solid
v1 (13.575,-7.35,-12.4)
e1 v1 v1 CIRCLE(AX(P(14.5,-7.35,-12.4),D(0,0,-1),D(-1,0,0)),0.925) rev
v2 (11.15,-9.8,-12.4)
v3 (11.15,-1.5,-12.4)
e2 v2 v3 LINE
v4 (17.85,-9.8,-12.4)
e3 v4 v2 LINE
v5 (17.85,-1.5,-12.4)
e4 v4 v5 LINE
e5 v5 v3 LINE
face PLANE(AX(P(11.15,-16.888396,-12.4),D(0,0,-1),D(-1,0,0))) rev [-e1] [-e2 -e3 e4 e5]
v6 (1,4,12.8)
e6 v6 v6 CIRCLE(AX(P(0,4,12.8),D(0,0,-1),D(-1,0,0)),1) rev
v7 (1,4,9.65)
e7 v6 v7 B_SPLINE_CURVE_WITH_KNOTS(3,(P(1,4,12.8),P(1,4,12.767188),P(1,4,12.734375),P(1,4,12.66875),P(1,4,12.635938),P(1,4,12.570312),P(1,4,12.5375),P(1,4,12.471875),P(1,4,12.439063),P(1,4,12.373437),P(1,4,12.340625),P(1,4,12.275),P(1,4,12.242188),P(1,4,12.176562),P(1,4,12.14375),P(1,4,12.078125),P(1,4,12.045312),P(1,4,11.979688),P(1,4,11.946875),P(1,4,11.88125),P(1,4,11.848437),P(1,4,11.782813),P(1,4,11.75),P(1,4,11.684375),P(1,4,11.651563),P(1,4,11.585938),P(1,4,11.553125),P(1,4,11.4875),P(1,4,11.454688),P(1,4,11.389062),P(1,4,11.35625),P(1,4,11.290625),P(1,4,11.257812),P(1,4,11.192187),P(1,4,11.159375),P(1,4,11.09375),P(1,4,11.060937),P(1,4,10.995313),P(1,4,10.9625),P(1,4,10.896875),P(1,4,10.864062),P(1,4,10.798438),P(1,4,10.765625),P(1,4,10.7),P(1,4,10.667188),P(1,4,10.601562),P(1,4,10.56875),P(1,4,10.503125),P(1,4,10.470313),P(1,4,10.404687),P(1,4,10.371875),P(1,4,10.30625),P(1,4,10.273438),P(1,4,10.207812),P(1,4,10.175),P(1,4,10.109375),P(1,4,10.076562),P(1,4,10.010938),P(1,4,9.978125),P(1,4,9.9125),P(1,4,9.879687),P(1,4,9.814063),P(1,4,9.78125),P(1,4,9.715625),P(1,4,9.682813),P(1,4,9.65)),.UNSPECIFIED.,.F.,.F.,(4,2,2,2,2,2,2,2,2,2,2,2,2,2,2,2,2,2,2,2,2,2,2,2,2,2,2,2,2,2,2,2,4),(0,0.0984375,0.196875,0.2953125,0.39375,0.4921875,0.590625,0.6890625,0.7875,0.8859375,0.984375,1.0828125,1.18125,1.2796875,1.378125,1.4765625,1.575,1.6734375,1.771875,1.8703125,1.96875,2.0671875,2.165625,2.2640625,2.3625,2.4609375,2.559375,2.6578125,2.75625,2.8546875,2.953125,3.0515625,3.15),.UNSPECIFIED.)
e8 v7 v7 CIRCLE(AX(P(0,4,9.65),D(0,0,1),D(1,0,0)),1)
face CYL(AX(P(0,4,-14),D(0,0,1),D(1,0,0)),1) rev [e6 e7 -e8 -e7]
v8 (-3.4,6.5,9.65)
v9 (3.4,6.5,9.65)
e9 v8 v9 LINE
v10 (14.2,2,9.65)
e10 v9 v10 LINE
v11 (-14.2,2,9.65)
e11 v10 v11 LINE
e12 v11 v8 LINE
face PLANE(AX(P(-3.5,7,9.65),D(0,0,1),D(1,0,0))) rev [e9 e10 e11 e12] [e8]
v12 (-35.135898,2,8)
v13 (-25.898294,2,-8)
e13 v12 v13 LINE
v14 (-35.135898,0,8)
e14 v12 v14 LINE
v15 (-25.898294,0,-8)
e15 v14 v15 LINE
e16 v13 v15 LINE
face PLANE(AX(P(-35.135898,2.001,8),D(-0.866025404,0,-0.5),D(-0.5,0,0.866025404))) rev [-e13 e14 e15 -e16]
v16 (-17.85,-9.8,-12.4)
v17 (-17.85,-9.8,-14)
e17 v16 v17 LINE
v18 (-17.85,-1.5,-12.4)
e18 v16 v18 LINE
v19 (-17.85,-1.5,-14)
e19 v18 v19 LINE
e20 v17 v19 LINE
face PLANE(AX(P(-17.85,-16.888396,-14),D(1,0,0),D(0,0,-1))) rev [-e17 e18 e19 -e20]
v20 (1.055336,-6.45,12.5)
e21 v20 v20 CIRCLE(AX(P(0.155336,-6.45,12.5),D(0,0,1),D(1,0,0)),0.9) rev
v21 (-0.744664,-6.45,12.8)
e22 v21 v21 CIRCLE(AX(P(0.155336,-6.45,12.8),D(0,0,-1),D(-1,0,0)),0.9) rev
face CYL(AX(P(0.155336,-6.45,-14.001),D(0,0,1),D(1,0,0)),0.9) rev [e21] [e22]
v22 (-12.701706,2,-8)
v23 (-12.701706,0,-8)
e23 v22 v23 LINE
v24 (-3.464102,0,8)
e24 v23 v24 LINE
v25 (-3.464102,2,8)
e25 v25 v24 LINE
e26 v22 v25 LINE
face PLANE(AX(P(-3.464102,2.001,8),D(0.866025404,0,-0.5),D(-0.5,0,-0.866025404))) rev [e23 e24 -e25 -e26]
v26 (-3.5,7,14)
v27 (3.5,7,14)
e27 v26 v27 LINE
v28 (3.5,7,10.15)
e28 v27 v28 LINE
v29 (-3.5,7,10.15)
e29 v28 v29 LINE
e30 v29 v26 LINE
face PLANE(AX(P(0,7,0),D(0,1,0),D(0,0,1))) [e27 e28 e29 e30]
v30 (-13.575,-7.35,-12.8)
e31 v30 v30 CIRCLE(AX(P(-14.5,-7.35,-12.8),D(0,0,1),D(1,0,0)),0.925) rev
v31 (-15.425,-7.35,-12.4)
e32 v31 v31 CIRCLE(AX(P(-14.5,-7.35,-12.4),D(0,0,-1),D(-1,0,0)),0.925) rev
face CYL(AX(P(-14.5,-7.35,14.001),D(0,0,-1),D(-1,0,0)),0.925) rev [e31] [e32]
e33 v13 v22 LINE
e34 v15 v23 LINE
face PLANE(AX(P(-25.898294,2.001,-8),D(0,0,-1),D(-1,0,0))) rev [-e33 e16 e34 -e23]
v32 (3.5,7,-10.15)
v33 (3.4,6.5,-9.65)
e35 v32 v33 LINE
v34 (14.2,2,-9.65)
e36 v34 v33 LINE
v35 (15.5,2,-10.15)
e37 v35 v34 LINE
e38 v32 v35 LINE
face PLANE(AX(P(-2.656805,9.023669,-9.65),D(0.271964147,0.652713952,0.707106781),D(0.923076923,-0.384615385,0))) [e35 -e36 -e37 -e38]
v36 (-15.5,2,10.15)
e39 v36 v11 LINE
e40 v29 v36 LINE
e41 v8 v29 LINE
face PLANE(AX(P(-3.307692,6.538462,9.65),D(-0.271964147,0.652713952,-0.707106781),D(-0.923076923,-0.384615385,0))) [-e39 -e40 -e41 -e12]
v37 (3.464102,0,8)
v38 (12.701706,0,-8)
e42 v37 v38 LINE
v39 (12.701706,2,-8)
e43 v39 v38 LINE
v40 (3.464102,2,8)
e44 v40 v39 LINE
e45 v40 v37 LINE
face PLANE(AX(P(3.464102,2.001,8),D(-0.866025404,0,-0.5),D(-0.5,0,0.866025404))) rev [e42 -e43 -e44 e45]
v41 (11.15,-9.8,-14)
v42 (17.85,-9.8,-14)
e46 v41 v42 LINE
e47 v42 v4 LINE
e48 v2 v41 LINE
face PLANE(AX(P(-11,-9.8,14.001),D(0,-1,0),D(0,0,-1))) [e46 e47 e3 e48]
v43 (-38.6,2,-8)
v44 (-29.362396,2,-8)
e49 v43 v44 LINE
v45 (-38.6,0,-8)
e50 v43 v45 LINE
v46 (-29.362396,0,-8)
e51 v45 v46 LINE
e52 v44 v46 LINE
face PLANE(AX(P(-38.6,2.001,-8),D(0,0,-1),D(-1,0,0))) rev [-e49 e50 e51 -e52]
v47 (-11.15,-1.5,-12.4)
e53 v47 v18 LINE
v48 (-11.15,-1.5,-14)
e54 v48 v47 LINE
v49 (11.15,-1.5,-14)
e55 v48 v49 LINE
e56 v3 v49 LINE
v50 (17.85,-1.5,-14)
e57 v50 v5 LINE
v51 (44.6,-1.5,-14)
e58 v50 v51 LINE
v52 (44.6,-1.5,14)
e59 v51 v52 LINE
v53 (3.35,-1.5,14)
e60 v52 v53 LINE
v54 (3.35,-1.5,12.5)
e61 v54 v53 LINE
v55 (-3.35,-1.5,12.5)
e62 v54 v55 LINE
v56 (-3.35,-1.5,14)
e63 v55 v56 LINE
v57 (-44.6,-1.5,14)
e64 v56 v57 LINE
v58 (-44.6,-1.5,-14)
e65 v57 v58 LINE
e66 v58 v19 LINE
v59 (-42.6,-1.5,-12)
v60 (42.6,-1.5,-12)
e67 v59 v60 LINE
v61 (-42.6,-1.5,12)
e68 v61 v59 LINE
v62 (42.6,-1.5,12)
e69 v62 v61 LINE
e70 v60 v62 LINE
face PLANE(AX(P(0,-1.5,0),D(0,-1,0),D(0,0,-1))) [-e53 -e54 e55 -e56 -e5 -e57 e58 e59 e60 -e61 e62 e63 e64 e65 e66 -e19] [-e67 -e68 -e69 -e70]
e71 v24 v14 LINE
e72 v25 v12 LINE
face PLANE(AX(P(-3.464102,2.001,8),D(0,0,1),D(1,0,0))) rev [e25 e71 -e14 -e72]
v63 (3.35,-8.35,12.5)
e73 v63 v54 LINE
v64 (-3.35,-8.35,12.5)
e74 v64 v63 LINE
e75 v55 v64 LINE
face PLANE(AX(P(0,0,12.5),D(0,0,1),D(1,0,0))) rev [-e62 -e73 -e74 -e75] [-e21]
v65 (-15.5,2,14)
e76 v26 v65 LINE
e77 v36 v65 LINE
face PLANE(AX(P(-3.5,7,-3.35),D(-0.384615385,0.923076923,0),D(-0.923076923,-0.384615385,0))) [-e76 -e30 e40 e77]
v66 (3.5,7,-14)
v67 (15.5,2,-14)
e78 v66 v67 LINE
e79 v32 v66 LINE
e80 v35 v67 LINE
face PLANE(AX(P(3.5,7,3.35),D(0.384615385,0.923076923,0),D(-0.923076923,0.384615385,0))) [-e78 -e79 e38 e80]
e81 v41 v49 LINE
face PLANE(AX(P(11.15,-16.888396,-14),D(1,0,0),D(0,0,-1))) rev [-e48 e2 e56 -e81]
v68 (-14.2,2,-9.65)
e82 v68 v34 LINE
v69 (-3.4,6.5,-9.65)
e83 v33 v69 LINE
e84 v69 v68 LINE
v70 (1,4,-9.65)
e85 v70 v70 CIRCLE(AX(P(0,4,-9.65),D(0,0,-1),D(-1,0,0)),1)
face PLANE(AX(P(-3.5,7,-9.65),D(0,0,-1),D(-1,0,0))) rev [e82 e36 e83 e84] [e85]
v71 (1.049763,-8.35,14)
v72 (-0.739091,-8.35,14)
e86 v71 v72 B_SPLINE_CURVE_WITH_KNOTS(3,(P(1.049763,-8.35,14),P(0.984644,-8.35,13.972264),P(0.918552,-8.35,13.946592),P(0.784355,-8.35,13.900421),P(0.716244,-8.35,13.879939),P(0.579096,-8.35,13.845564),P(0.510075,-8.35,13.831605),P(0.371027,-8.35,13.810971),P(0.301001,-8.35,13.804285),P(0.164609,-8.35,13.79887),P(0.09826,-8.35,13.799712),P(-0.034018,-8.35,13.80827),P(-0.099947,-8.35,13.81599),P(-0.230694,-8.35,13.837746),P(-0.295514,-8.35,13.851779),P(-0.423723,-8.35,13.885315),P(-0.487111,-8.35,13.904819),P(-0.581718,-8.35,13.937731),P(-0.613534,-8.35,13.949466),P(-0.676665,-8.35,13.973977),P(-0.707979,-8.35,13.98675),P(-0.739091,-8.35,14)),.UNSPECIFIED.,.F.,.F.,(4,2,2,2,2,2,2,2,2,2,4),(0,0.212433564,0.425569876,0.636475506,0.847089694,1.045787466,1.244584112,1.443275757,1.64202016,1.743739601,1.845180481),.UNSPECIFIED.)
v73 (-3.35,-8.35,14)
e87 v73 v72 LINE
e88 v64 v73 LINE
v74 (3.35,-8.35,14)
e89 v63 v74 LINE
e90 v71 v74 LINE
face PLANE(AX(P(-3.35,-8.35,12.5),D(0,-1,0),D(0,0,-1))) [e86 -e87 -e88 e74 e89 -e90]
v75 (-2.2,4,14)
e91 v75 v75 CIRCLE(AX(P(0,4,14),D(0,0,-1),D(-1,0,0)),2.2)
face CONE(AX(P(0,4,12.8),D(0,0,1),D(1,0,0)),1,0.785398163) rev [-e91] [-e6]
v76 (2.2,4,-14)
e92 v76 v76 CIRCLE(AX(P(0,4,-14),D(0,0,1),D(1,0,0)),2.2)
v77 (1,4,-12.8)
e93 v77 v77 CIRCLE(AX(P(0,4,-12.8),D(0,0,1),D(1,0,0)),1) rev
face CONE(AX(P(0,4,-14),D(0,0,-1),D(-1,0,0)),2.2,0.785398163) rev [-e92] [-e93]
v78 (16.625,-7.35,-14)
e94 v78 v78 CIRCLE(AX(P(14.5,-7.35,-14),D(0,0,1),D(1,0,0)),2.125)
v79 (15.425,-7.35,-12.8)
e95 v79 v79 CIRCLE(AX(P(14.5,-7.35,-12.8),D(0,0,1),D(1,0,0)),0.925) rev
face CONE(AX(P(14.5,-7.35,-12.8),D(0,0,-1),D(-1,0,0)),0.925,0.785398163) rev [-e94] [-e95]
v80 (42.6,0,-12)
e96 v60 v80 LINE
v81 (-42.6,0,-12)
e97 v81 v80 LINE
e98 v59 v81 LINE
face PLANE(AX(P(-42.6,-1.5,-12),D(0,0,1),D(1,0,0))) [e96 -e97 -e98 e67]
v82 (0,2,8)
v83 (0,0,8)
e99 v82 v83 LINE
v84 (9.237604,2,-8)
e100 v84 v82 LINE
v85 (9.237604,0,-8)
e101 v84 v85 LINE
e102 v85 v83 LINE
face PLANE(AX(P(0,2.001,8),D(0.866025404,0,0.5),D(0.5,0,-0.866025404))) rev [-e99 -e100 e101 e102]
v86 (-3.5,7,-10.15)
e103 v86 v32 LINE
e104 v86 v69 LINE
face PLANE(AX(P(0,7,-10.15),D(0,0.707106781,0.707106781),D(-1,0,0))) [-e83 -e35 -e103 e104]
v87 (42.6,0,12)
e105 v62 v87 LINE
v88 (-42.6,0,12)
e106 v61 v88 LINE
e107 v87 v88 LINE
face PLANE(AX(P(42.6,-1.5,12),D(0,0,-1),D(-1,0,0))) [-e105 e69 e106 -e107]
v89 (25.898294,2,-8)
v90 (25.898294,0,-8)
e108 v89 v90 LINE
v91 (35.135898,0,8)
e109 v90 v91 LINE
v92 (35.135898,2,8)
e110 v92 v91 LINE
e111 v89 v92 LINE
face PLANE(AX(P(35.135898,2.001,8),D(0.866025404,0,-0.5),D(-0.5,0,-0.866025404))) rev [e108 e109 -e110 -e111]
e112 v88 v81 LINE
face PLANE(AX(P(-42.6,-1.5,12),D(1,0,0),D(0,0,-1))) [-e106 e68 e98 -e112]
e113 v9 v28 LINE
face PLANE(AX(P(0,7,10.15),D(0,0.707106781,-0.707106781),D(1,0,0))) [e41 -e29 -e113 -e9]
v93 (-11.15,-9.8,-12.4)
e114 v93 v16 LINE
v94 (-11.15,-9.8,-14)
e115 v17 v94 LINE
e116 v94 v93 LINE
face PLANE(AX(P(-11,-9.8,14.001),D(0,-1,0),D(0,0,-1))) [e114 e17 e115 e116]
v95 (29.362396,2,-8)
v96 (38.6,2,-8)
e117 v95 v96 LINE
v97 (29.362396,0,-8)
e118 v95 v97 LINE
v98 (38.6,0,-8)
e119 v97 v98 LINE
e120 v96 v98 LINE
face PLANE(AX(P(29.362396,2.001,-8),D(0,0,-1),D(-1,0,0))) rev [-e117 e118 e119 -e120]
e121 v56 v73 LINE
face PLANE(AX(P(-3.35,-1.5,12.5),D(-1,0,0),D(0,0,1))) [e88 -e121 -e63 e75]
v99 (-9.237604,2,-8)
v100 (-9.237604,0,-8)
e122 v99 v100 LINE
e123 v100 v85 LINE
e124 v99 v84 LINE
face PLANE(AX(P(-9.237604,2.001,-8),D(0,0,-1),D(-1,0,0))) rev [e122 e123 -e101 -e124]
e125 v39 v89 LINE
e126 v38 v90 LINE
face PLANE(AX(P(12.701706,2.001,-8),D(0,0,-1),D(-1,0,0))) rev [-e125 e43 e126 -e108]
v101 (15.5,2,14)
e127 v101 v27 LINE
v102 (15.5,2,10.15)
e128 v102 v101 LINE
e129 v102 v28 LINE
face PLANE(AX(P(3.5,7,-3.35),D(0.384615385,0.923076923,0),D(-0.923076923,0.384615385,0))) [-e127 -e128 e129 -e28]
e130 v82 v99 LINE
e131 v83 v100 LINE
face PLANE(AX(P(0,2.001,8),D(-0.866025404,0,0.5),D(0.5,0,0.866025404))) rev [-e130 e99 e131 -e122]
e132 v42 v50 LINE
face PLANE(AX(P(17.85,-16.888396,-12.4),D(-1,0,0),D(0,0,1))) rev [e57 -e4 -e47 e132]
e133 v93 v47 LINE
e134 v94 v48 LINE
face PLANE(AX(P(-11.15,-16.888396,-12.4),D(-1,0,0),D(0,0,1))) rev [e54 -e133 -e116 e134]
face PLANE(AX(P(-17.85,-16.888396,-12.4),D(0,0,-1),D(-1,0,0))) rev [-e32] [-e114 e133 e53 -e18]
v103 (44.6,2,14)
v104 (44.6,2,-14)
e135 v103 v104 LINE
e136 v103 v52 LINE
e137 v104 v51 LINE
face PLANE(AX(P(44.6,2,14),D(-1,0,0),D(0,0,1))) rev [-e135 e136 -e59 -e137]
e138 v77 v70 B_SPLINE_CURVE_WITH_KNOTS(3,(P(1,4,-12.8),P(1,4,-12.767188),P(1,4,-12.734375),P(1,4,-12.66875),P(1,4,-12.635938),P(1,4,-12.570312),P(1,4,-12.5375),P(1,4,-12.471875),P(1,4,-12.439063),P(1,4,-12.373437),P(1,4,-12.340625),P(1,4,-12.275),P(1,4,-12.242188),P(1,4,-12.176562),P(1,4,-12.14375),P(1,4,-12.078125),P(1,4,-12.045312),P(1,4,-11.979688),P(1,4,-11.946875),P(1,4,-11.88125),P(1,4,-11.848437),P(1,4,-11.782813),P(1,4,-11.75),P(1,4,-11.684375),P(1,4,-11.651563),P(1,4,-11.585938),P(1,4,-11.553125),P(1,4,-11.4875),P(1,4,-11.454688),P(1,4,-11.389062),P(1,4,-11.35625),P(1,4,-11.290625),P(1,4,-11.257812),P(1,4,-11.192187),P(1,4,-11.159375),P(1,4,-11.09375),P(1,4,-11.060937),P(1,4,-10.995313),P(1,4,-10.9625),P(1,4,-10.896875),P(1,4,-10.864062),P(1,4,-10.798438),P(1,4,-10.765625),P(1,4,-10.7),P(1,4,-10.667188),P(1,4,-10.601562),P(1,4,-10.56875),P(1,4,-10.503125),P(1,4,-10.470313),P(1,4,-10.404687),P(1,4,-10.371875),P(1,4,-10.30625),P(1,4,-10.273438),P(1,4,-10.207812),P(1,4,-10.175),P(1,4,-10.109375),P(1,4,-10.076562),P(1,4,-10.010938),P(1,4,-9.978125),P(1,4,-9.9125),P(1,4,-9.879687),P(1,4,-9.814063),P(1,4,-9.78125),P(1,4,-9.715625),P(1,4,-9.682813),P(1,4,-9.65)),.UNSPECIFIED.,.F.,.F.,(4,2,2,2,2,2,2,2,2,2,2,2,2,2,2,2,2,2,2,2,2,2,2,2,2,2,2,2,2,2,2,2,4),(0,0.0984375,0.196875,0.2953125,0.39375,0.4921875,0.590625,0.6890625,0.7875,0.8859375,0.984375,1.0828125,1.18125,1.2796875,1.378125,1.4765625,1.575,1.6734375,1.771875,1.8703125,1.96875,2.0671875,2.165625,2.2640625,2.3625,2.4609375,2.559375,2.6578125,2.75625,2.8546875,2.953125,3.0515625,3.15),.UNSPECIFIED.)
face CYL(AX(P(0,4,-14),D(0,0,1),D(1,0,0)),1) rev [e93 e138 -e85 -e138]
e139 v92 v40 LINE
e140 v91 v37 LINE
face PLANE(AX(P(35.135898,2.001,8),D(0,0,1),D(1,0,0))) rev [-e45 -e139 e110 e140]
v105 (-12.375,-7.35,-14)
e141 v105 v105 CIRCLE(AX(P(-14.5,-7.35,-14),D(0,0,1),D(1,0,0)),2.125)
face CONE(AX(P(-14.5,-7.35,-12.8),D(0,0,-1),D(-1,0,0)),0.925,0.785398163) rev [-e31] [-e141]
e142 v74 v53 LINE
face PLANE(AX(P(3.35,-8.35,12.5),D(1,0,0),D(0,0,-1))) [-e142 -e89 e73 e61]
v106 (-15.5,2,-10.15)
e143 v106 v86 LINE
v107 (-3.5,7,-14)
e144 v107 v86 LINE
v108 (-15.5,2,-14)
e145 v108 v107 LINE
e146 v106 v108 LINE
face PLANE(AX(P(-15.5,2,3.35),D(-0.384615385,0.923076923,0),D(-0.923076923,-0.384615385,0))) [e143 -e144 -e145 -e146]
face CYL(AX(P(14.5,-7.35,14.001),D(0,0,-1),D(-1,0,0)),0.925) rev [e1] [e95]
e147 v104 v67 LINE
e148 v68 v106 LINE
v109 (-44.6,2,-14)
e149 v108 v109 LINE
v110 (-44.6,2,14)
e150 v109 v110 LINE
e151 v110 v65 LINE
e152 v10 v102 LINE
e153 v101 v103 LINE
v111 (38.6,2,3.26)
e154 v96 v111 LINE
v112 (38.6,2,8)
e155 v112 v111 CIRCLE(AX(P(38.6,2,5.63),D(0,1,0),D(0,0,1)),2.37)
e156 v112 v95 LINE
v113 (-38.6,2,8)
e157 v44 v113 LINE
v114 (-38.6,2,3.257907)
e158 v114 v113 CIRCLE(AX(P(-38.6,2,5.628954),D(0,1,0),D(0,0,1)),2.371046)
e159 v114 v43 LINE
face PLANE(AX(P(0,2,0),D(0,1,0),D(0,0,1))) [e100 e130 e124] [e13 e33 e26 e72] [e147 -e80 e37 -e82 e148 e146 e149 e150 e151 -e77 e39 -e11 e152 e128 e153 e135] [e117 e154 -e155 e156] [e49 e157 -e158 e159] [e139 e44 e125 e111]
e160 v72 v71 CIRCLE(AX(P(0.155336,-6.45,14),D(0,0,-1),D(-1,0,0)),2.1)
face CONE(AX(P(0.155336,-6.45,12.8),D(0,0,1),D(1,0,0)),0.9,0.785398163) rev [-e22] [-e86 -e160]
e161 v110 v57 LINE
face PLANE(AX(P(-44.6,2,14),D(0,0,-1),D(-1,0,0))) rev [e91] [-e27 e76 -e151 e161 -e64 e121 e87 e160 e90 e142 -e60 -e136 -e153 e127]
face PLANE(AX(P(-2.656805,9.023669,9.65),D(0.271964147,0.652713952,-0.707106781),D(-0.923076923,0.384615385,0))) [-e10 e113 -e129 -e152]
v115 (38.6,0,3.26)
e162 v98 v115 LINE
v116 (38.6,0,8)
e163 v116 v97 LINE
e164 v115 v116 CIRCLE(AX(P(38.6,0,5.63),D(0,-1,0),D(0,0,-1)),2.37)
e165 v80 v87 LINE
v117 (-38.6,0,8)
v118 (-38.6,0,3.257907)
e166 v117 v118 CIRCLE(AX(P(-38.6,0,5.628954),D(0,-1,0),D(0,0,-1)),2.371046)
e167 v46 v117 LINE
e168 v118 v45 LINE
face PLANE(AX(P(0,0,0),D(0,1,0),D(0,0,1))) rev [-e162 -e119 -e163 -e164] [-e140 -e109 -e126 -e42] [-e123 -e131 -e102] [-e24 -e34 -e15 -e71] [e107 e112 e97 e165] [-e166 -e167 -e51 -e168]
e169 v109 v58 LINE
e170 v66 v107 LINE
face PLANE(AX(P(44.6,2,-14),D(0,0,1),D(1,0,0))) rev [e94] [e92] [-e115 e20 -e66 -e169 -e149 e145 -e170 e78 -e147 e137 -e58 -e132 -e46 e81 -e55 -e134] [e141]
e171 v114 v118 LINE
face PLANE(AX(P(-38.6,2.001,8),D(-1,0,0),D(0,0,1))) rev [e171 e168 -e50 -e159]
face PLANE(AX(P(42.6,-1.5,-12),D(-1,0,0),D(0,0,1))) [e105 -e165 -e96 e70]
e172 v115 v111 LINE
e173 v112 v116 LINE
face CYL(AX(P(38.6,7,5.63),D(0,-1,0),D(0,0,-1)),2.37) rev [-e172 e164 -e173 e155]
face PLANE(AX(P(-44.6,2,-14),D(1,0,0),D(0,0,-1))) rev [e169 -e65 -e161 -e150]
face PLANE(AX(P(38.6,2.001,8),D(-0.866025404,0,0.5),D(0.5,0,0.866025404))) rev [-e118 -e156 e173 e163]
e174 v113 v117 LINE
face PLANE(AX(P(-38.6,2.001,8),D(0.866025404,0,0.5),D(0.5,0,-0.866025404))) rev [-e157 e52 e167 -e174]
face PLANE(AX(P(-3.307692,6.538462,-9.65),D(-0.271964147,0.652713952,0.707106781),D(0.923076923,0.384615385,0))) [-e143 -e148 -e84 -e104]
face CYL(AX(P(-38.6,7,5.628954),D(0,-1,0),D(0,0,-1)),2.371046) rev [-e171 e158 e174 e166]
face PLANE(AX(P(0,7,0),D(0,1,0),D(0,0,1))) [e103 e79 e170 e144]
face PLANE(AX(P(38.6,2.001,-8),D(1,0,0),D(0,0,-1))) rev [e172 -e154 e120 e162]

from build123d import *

# Parameters (mm, degrees)
SKETCH1_W           = 89.2
SKETCH1_H           = 28
BOSS_EXTRUDE1_DEPTH = 2
SKETCH3_W           = 89.2
SKETCH3_H           = 28
SKETCH3_W_2         = 85.2
SKETCH3_H_2         = 24
BOSS_EXTRUDE2_DEPTH = 1.5
CUT_EXTRUDE1_REACH  = 48.788
SKETCH5_W           = 7
SKETCH5_H           = 4.35
BOSS_EXTRUDE3_DEPTH = 5
SKETCH6_R           = 1
CUT_EXTRUDE2_DEPTH  = 54.124005873
BOSS_EXTRUDE4_DEPTH = 4.35
BOSS_EXTRUDE5_DEPTH = 4.35
CHAMFER1_SIZE       = 1.2
CHAMFER2_SIZE       = 1.2
SKETCH9_W           = 6.7
SKETCH9_H           = 6.85
BOSS_EXTRUDE6_DEPTH = 1.5
SKETCH15_W          = 6.7
SKETCH15_H          = 1.6
BOSS_EXTRUDE7_DEPTH = 8.3
CUT_EXTRUDE9_REACH  = 55.565
SKETCH16_R          = 0.925
CUT_EXTRUDE11_REACH = 55.565
SKETCH17_R          = 0.9
CHAMFER3_SIZE       = 1.2
CHAMFER4_SIZE       = 1.2
CUT_EXTRUDE12_DEPTH = 48.76190951
CHAMFER5_SIZE       = 0.5
CHAMFER6_SIZE       = 0.5


with BuildPart() as part:
    # Sketch1 → Boss-Extrude1 (new body)
    with BuildSketch(Plane(origin=(0, 0, 0), x_dir=(1, 0, 0), z_dir=(0, 1, 0))):
        Rectangle(SKETCH1_W, SKETCH1_H)
    extrude(amount=BOSS_EXTRUDE1_DEPTH)

    # Sketch3 → Boss-Extrude2 (add)
    with BuildSketch(Plane.XZ):
        Rectangle(SKETCH3_W, SKETCH3_H)
        Rectangle(SKETCH3_W_2, SKETCH3_H_2, mode=Mode.SUBTRACT)
    extrude(amount=BOSS_EXTRUDE2_DEPTH)

    # Sketch4 → Cut-Extrude1 (cut, up to next)
    with BuildSketch(Plane.XZ, mode=Mode.PRIVATE) as cut_extrude1_sk1:
        Polygon((38.6, -8), (38.6, 8), (29.362395693, -8), align=None)
    cut_extrude1_tool1 = extrude(cut_extrude1_sk1.sketch, amount=-CUT_EXTRUDE1_REACH, mode=Mode.PRIVATE) & part.part
    # Sketch4 → Cut-Extrude1 (cut, up to next)
    with BuildSketch(Plane.XZ, mode=Mode.PRIVATE) as cut_extrude1_sk2:
        Polygon((35.135898385, 8), (3.464101615, 8), (12.701705922, -8), (25.898294078, -8), align=None)
    cut_extrude1_tool2 = extrude(cut_extrude1_sk2.sketch, amount=-CUT_EXTRUDE1_REACH, mode=Mode.PRIVATE) & part.part
    # Sketch4 → Cut-Extrude1 (cut, up to next)
    with BuildSketch(Plane.XZ, mode=Mode.PRIVATE) as cut_extrude1_sk3:
        Polygon((-38.6, 8), (-38.6, -8), (-29.362395693, -8), align=None)
    cut_extrude1_tool3 = extrude(cut_extrude1_sk3.sketch, amount=-CUT_EXTRUDE1_REACH, mode=Mode.PRIVATE) & part.part
    # Sketch4 → Cut-Extrude1 (cut, up to next)
    with BuildSketch(Plane.XZ, mode=Mode.PRIVATE) as cut_extrude1_sk4:
        Polygon((0, 8), (-9.237604307, -8), (9.237604307, -8), align=None)
    cut_extrude1_tool4 = extrude(cut_extrude1_sk4.sketch, amount=-CUT_EXTRUDE1_REACH, mode=Mode.PRIVATE) & part.part
    # Sketch4 → Cut-Extrude1 (cut, up to next)
    with BuildSketch(Plane.XZ, mode=Mode.PRIVATE) as cut_extrude1_sk5:
        Polygon((-3.464101615, 8), (-12.701705922, -8), (-25.898294078, -8), (-35.135898385, 8), align=None)
    cut_extrude1_tool5 = extrude(cut_extrude1_sk5.sketch, amount=-CUT_EXTRUDE1_REACH, mode=Mode.PRIVATE) & part.part
    add(cut_extrude1_tool1.solids().sort_by_distance((35.520799, 0, -2.666667))[0], mode=Mode.SUBTRACT)
    add(cut_extrude1_tool2.solids().sort_by_distance((19.3, 0, 1.098039))[0], mode=Mode.SUBTRACT)
    add(cut_extrude1_tool3.solids().sort_by_distance((-35.520799, 0, -2.666667))[0], mode=Mode.SUBTRACT)
    add(cut_extrude1_tool4.solids().sort_by_distance((0, 0, -2.666667))[0], mode=Mode.SUBTRACT)
    add(cut_extrude1_tool5.solids().sort_by_distance((-19.3, 0, 1.098039))[0], mode=Mode.SUBTRACT)

    # Sketch5 → Boss-Extrude3 (add)
    with BuildSketch(Plane(origin=(0, 2, 0), x_dir=(1, 0, 0), z_dir=(0, 1, 0))):
        with Locations((0, 11.825)):
            Rectangle(SKETCH5_W, SKETCH5_H)
        with Locations((0, -11.825)):
            Rectangle(SKETCH5_W, SKETCH5_H)
    extrude(amount=BOSS_EXTRUDE3_DEPTH)

    # Sketch6 → Cut-Extrude2 (cut, through all)
    with BuildSketch(Plane.XY.offset(14)):
        with Locations((0, 4)):
            Circle(SKETCH6_R)
    extrude(amount=-CUT_EXTRUDE2_DEPTH, mode=Mode.SUBTRACT)

    # Sketch7 → Boss-Extrude4 (add)
    with BuildSketch(Plane.XY.offset(14)):
        Polygon((3.5, 7), (3.5, 2), (15.5, 2), align=None)
        Polygon((-3.5, 7), (-3.5, 2), (-15.5, 2), align=None)
    extrude(amount=-BOSS_EXTRUDE4_DEPTH)

    # Sketch8 → Boss-Extrude5 (add)
    with BuildSketch(Plane(origin=(0, 0, -14), x_dir=(-1, 0, 0), z_dir=(0, 0, -1))):
        Polygon((3.5, 7), (3.5, 2), (15.5, 2), align=None)
        Polygon((-3.5, 7), (-3.5, 2), (-15.5, 2), align=None)
    extrude(amount=-BOSS_EXTRUDE5_DEPTH)

    # Chamfer1
    chamfer1_edges = [part.edges().sort_by_distance(p)[0] for p in [
        (-1, 4, -14),
    ]]
    chamfer(chamfer1_edges, length=CHAMFER1_SIZE)

    # Chamfer2
    chamfer2_edges = [part.edges().sort_by_distance(p)[0] for p in [
        (-1, 4, 14),
    ]]
    chamfer(chamfer2_edges, length=CHAMFER2_SIZE)

    # Sketch9 → Boss-Extrude6 (add)
    with BuildSketch(Plane.XY.offset(14)):
        with Locations((0, -4.925)):
            Rectangle(SKETCH9_W, SKETCH9_H)
    extrude(amount=-BOSS_EXTRUDE6_DEPTH)

    # Sketch15 → Boss-Extrude7 (add)
    with BuildSketch(Plane.XZ.offset(1.5)):
        with Locations((14.5, -13.2)):
            Rectangle(SKETCH15_W, SKETCH15_H)
        with Locations((-14.5, -13.2)):
            Rectangle(SKETCH15_W, SKETCH15_H)
    extrude(amount=BOSS_EXTRUDE7_DEPTH)

    # Sketch16 → Cut-Extrude9 (cut, up to next)
    with BuildSketch(Plane(origin=(0, 0, -14), x_dir=(-1, 0, 0), z_dir=(0, 0, -1)), mode=Mode.PRIVATE) as cut_extrude9_sk1:
        with Locations((14.5, -7.35)):
            Circle(SKETCH16_R)
    cut_extrude9_tool1 = extrude(cut_extrude9_sk1.sketch, amount=-CUT_EXTRUDE9_REACH, mode=Mode.PRIVATE) & part.part
    # Sketch16 → Cut-Extrude9 (cut, up to next)
    with BuildSketch(Plane(origin=(0, 0, -14), x_dir=(-1, 0, 0), z_dir=(0, 0, -1)), mode=Mode.PRIVATE) as cut_extrude9_sk2:
        with Locations((-14.5, -7.35)):
            Circle(SKETCH16_R)
    cut_extrude9_tool2 = extrude(cut_extrude9_sk2.sketch, amount=-CUT_EXTRUDE9_REACH, mode=Mode.PRIVATE) & part.part
    add(cut_extrude9_tool1.solids().sort_by_distance((-14.5, -7.35, -14))[0], mode=Mode.SUBTRACT)
    add(cut_extrude9_tool2.solids().sort_by_distance((14.5, -7.35, -14))[0], mode=Mode.SUBTRACT)

    # Sketch17 → Cut-Extrude11 (cut, up to next)
    with BuildSketch(Plane.XY.offset(14), mode=Mode.PRIVATE) as cut_extrude11_sk1:
        with Locations((0.155335946, -6.45)):
            Circle(SKETCH17_R)
    cut_extrude11_tool1 = extrude(cut_extrude11_sk1.sketch, amount=-CUT_EXTRUDE11_REACH, mode=Mode.PRIVATE) & part.part
    add(cut_extrude11_tool1.solids().sort_by_distance((0.155336, -6.45, 14))[0], mode=Mode.SUBTRACT)

    # Chamfer3
    # the kernel refuses this chamfer: 1.2 mm, written as the material it takes off along each edge
    with BuildSketch(Plane(origin=(0.155335946, -6.45, 14), x_dir=(1, 0, 0), z_dir=(0, -1, 0))) as chamfer3_piece_1:
        Polygon((0.9 + CHAMFER3_SIZE, 0), (0.9, -CHAMFER3_SIZE), (0.9, 0), align=None)
    revolve(axis=Axis((0.155335946, -6.45, 14), (0, 0, 1)), mode=Mode.SUBTRACT)

    # Chamfer4
    chamfer4_edges = [part.edges().sort_by_distance(p)[0] for p in [
        (-13.575, -7.35, -14),
        (15.425, -7.35, -14),
    ]]
    chamfer(chamfer4_edges, length=CHAMFER4_SIZE)

    # Sketch18 → Cut-Extrude12 (cut, through all)
    with BuildSketch(Plane.XZ):
        with BuildLine():
            Line((38.6, 3.26), (38.6, 8))
            ThreePointArc((38.6, 8), (40.97, 5.63), (38.6, 3.26))
        make_face()
        with BuildLine():
            Line((-38.6, 8), (-38.6, 3.257907009))
            ThreePointArc((-38.6, 3.257907009), (-40.971046495, 5.628953505), (-38.6, 8))
        make_face()
    extrude(amount=-CUT_EXTRUDE12_DEPTH, mode=Mode.SUBTRACT)

    # Chamfer5
    chamfer5_edges = [part.edges().sort_by_distance(p)[0] for p in [
        (0, 7, -9.65),
        (-9.5, 4.5, -9.65),
        (9.5, 4.5, -9.65),
    ]]
    chamfer(chamfer5_edges, length=CHAMFER5_SIZE)

    # Chamfer6
    chamfer6_edges = [part.edges().sort_by_distance(p)[0] for p in [
        (0, 7, 9.65),
        (9.5, 4.5, 9.65),
        (-9.5, 4.5, 9.65),
    ]]
    chamfer(chamfer6_edges, length=CHAMFER6_SIZE)


solid = part.part
